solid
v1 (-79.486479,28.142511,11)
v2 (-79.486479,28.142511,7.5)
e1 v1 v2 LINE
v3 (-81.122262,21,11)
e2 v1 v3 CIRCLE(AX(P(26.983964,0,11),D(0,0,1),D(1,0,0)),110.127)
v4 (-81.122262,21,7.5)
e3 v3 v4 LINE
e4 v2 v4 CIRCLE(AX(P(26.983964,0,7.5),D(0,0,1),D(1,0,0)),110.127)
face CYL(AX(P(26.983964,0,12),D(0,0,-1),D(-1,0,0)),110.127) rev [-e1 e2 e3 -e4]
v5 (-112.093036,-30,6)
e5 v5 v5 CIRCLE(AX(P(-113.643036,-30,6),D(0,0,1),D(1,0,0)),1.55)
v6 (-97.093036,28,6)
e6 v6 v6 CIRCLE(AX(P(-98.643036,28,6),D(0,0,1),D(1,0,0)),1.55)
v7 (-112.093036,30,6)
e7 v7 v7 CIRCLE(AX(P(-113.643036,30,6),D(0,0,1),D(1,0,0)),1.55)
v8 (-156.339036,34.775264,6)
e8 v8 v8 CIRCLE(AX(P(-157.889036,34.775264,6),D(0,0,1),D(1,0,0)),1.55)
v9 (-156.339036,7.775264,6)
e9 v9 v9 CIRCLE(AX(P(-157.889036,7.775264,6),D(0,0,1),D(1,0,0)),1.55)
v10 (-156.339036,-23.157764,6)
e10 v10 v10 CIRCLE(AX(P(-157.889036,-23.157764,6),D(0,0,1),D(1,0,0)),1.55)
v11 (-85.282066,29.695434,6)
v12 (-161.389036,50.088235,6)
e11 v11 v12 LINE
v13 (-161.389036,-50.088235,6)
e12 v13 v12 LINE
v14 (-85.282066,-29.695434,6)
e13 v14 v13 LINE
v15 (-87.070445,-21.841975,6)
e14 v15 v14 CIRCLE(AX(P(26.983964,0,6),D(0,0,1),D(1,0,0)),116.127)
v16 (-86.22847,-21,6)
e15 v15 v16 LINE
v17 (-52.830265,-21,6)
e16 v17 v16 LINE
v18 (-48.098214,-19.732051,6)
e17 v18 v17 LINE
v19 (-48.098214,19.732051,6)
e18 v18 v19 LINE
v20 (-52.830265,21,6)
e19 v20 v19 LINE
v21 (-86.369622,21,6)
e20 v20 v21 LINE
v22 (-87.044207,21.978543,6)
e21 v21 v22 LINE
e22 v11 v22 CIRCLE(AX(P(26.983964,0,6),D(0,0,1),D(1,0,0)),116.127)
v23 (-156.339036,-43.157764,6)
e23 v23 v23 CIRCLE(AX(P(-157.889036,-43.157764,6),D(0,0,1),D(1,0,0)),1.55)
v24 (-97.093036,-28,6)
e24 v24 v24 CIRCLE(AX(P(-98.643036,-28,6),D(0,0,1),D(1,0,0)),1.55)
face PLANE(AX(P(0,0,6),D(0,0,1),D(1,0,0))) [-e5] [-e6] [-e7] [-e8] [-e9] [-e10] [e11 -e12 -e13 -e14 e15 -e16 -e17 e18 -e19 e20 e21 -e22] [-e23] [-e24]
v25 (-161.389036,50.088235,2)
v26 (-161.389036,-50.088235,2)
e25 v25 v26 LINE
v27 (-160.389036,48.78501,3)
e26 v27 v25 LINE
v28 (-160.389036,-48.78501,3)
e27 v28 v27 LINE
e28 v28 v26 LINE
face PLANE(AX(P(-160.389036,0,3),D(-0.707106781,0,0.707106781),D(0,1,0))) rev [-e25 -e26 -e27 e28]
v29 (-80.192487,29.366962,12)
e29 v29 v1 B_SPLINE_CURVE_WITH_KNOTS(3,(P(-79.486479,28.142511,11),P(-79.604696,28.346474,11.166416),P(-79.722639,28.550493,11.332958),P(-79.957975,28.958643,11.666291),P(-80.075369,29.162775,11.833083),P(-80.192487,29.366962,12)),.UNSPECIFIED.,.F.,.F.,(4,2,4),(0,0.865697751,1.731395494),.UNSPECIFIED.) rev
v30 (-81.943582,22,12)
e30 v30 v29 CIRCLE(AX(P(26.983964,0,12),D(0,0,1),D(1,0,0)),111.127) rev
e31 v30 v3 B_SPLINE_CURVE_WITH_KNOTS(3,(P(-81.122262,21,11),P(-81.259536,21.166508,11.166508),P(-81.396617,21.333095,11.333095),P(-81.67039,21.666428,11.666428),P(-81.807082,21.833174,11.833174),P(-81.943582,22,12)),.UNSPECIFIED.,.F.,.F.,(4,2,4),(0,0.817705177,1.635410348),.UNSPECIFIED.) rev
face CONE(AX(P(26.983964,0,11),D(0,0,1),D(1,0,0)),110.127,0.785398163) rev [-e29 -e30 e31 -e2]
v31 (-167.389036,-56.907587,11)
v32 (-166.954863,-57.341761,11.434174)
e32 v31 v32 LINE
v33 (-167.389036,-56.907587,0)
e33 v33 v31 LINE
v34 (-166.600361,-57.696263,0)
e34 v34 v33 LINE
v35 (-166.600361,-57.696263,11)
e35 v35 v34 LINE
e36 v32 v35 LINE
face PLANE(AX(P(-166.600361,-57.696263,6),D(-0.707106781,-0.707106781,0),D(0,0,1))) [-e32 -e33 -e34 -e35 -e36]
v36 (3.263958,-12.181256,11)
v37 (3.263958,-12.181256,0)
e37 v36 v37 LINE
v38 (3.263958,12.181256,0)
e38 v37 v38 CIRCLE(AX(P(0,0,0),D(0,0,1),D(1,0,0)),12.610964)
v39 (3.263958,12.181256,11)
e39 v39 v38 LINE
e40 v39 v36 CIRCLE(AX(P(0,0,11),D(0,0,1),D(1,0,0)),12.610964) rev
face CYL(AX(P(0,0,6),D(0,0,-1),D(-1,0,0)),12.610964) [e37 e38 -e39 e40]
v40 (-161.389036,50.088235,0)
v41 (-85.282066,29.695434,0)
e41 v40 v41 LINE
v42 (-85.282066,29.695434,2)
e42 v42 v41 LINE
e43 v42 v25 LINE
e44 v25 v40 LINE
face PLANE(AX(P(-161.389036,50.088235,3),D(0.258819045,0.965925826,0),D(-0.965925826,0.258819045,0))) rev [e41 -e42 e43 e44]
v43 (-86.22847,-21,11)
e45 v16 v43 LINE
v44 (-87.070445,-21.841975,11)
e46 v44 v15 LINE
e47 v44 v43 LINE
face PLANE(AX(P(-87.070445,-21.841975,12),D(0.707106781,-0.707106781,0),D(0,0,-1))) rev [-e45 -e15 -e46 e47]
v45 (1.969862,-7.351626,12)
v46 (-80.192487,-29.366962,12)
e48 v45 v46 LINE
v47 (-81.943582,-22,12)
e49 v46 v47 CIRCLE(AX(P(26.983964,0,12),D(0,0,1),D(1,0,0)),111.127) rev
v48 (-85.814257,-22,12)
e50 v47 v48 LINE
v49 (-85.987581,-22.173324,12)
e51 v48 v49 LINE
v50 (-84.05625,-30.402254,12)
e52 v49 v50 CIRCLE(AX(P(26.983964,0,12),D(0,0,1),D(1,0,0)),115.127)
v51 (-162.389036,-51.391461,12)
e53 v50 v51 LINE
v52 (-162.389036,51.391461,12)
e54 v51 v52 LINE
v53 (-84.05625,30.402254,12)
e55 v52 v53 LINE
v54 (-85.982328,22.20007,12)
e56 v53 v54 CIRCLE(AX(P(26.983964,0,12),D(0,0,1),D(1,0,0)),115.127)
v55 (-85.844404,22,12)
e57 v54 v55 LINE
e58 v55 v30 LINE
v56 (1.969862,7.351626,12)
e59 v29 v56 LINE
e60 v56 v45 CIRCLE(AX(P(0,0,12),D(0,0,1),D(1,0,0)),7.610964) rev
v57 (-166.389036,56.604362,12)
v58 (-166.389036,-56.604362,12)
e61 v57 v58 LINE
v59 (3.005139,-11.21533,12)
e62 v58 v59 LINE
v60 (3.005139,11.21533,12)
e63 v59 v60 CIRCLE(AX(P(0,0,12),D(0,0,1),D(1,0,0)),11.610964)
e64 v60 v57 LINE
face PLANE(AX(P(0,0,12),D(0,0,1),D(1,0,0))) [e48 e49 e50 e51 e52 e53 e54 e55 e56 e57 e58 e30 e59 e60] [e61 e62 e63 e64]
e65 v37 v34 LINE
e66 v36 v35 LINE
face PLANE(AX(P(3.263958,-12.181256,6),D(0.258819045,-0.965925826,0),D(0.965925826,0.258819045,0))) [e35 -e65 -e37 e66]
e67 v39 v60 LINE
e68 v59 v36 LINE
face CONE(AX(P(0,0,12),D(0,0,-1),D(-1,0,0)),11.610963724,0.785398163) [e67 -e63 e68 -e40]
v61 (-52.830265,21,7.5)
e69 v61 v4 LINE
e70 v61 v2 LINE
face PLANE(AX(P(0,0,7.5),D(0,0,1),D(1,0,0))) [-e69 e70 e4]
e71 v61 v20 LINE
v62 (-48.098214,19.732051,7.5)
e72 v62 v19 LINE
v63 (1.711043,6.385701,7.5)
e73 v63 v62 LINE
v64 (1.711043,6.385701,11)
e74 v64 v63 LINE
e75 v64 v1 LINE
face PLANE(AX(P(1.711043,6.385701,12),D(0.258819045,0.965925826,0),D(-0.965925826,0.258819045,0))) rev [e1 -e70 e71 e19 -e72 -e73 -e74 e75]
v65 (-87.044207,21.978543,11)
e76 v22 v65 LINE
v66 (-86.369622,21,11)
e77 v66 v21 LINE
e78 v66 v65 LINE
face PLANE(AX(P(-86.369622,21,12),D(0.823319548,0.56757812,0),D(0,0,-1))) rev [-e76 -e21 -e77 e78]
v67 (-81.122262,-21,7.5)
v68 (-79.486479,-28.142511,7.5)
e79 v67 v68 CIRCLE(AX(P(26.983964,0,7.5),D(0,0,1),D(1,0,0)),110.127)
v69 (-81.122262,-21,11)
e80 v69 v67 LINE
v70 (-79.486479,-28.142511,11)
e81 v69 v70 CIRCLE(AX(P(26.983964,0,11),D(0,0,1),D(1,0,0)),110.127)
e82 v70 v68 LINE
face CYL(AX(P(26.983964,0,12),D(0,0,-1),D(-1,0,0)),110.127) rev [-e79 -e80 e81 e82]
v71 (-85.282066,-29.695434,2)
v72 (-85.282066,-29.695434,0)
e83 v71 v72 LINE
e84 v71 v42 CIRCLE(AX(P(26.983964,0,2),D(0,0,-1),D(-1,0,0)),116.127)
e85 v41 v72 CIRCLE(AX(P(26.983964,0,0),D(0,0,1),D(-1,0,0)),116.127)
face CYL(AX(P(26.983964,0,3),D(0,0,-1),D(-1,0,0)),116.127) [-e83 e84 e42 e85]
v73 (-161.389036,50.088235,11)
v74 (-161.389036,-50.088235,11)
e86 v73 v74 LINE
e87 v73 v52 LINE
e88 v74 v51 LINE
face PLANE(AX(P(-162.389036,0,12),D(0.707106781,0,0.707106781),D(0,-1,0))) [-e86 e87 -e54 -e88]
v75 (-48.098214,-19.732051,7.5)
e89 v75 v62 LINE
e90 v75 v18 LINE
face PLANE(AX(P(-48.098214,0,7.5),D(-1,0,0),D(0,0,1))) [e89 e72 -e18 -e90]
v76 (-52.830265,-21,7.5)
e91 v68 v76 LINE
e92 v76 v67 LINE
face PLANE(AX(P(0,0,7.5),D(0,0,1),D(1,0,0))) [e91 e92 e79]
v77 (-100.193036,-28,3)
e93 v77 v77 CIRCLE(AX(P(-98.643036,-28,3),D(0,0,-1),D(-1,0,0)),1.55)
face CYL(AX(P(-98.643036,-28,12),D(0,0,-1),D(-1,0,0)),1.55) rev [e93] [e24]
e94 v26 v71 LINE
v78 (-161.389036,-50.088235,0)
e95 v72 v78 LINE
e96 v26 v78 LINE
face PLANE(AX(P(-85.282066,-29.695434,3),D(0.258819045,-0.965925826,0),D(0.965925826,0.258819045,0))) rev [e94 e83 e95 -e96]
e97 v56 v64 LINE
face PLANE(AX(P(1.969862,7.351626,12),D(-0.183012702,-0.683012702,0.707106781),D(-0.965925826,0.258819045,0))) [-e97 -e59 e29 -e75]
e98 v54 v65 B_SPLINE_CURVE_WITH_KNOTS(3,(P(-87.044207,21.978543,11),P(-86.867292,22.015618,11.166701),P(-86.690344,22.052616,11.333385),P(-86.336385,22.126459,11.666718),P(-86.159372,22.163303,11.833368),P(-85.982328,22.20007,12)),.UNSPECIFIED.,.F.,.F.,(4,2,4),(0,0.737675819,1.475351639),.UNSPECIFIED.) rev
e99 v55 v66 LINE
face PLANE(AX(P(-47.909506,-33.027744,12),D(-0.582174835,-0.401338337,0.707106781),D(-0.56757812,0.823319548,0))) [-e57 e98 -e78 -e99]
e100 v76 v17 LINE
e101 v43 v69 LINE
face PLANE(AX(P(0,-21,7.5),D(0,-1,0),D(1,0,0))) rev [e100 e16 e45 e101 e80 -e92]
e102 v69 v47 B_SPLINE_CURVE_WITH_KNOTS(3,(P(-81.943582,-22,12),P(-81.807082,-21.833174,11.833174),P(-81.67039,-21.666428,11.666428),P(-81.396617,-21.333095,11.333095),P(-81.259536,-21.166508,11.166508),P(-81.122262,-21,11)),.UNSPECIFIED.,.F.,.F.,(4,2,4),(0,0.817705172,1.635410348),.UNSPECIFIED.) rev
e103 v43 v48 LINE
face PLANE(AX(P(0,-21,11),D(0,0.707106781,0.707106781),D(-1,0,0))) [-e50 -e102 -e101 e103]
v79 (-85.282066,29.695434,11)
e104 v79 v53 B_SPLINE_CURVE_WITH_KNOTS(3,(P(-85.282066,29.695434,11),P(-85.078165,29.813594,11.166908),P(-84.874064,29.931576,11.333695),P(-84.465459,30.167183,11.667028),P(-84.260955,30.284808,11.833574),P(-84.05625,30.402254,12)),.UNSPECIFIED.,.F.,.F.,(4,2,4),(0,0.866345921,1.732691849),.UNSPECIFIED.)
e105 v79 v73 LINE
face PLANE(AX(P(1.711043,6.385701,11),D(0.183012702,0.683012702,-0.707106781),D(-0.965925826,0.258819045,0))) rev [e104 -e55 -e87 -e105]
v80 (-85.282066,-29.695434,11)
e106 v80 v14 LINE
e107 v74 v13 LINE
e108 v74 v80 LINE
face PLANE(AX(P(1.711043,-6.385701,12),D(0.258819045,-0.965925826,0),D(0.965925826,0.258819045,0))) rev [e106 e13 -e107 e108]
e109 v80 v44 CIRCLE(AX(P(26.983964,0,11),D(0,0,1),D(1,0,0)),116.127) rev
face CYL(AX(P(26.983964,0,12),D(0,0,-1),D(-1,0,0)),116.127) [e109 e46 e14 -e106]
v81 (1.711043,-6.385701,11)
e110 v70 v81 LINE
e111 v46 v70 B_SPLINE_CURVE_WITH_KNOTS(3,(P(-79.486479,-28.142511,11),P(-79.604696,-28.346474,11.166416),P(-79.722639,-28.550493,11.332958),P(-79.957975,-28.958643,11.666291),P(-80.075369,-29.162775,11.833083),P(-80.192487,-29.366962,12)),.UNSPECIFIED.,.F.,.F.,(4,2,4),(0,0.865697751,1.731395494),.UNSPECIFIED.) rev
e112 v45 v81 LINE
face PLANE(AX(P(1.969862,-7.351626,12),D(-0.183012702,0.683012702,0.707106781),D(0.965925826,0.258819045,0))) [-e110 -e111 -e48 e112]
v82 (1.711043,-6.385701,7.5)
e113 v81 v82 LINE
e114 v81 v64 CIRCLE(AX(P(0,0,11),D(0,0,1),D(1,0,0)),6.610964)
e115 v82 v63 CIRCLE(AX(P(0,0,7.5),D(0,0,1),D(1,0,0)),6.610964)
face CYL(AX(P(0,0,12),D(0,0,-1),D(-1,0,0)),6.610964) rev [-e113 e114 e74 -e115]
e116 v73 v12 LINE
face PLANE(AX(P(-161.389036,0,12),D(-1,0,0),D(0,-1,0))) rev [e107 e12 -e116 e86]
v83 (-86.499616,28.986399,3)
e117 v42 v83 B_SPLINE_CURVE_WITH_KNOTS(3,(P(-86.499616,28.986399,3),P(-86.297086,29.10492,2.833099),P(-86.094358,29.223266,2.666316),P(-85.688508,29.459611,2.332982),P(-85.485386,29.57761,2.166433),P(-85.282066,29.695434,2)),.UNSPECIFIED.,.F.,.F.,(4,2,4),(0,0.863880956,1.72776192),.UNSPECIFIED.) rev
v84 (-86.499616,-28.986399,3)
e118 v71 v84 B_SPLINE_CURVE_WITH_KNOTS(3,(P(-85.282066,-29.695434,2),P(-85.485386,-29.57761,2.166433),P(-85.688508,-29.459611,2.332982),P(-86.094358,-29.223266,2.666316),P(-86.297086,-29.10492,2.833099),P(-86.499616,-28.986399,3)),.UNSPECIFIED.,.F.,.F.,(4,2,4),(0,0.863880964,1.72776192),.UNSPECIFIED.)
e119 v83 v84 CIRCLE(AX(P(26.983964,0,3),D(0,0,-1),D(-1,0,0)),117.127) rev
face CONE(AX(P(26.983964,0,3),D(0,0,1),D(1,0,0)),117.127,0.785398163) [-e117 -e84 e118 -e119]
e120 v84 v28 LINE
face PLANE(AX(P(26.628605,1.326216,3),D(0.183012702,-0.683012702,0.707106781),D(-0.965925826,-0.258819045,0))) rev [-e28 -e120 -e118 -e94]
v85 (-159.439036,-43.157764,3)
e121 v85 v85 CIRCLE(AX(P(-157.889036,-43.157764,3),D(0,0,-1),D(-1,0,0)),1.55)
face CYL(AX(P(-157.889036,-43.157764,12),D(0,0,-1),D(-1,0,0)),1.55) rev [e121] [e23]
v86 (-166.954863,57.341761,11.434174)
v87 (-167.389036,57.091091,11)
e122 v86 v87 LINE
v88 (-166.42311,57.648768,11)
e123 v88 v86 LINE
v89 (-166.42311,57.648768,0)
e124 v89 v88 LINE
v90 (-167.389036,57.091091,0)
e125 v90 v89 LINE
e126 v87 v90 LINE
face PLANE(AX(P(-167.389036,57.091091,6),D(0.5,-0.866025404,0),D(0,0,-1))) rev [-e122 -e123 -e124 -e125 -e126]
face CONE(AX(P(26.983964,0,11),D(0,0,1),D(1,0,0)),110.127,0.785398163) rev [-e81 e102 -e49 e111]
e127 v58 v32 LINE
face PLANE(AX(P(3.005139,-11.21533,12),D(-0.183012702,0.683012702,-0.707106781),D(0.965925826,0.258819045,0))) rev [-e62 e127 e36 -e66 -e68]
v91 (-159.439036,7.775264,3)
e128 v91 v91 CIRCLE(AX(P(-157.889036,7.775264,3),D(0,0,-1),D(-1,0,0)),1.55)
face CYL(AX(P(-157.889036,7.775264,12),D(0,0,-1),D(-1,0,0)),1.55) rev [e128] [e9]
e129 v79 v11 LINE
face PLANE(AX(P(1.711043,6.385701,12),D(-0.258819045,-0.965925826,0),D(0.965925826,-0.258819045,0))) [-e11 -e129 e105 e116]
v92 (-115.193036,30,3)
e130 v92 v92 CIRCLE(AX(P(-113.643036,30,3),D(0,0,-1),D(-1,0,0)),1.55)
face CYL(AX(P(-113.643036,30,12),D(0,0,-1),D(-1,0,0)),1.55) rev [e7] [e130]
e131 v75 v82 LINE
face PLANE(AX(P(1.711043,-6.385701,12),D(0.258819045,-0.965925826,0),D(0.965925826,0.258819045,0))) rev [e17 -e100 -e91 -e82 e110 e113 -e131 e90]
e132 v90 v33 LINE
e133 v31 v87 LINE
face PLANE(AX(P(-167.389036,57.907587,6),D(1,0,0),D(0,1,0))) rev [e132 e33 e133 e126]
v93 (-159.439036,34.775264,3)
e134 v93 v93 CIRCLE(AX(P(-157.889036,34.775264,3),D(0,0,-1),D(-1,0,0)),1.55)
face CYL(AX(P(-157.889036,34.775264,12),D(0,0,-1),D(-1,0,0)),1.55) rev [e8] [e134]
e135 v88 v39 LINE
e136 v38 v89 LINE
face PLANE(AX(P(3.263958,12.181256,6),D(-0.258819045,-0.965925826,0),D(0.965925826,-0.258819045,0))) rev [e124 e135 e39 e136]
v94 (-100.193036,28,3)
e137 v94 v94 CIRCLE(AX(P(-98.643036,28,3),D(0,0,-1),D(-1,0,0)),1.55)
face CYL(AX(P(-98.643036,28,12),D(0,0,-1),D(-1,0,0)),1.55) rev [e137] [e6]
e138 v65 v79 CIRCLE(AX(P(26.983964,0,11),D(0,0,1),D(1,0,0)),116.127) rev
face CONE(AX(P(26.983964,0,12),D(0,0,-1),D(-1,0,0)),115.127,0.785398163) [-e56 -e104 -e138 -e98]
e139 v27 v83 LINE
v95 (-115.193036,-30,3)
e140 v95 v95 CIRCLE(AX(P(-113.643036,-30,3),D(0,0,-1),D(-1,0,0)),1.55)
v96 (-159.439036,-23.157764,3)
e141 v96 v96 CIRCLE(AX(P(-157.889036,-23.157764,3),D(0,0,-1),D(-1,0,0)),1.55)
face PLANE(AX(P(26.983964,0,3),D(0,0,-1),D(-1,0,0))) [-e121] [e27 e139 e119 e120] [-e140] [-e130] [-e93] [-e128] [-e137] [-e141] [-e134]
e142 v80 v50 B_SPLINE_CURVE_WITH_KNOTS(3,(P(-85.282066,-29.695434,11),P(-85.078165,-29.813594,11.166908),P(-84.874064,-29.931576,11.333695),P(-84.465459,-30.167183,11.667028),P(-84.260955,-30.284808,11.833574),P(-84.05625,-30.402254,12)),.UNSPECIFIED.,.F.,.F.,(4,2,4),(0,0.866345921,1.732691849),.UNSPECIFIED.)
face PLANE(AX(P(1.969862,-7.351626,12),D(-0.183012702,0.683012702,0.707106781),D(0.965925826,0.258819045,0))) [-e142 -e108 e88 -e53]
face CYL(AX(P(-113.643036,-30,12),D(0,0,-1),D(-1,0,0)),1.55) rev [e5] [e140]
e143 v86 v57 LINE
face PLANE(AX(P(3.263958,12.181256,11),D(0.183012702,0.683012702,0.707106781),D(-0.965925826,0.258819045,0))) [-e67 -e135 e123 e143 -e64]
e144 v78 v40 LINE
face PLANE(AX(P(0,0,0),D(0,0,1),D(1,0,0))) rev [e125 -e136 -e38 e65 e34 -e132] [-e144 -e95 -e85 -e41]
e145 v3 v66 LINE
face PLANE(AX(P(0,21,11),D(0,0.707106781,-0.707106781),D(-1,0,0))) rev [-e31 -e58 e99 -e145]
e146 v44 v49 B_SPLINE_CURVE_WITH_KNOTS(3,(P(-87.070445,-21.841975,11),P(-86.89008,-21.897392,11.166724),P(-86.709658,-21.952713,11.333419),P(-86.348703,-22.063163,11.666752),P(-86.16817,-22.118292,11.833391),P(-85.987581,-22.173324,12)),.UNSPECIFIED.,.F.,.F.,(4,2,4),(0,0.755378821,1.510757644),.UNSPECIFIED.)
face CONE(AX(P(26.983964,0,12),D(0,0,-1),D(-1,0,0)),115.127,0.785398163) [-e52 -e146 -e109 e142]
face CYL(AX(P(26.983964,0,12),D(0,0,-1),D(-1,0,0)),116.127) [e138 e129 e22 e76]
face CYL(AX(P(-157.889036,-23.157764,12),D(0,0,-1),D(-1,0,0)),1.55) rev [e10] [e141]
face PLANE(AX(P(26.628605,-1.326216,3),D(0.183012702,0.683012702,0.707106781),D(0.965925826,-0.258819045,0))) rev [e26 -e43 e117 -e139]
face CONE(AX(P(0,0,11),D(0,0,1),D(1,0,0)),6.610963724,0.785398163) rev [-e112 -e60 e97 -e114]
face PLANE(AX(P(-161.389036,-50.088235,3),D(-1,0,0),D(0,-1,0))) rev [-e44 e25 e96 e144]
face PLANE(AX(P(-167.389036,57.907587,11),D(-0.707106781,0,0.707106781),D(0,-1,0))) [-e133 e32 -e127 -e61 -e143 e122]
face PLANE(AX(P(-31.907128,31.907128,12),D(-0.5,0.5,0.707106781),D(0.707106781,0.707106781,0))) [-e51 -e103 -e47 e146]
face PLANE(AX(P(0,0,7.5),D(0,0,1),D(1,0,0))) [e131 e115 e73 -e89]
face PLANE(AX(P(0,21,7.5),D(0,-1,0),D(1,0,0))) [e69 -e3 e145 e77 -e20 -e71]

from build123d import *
from OCP.BRepFilletAPI import BRepFilletAPI_MakeChamfer

# Parameters (mm, degrees)
BOSS_EXTRUDE1_DEPTH     = 6
BOSS_EXTRUDE2_START     = 6
BOSS_EXTRUDE2_DEPTH     = 6
BOSS_EXTRUDE3_DEPTH     = 1.5
CUT_EXTRUDE3_DEPTH      = 6
CHAMFER1_SIZE           = 0.858848527
CHAMFER1_SIZE_2         = 1
CHAMFER2_SIZE           = 1
CHAMFER3_SIZE           = 1
CHAMFER3_SIZE2          = 0.816496581
CUT_EXTRUDE4_DEPTH      = 3
CHAMFER4_SIZE           = 1
CUT_EXTRUDE5_DEPTH      = 178.282114668
CUT_EXTRUDE5_DEPTH_BACK = 178.282114668
SKETCH8_R               = 1.55


with BuildPart() as part:
    # Sketch3 → Boss-Extrude1 (new body)
    with BuildSketch(Plane.XY):
        with BuildLine():
            Line((3.263957589, 12.181255556), (-167.389036276, 57.907587448))
            Line((-167.389036276, 57.907587448), (-167.389036276, -57.907587448))
            Line((-167.389036276, -57.907587448), (-83.597968128, -35.455838404))
            Line((-83.597968128, -35.455838404), (3.263957589, -12.181255556))
            ThreePointArc((3.263957589, -12.181255556), (12.610963724, 0), (3.263957589, 12.181255556))
        make_face()
    extrude(amount=BOSS_EXTRUDE1_DEPTH)

    # Sketch3<3> → Boss-Extrude2 (add)
    with BuildSketch(Plane.XY.offset(BOSS_EXTRUDE2_START)):
        with BuildLine():
            ThreePointArc((3.263957589, -12.181255556), (12.610963724, 0), (3.263957589, 12.181255556))
            Line((3.263957589, 12.181255556), (-167.389036276, 57.907587448))
            Line((-167.389036276, 57.907587448), (-167.389036276, -57.907587448))
            Line((-167.389036276, -57.907587448), (-83.597968128, -35.455838404))
            Line((-83.597968128, -35.455838404), (3.263957589, -12.181255556))
        make_face()
        with BuildLine():
            Line((1.711043318, -6.385700598), (-79.486479098, -28.142511157))
            ThreePointArc((-79.486479098, -28.142511157), (-83.143036276, 0), (-79.486479098, 28.142511157))
            Line((-79.486479098, 28.142511157), (1.711043318, 6.385700598))
            ThreePointArc((1.711043318, 6.385700598), (6.610963724, 0), (1.711043318, -6.385700598))
        make_face(mode=Mode.SUBTRACT)
        with BuildLine():
            Line((-85.282065581, -29.695433875), (-161.389036276, -50.088235211))
            Line((-161.389036276, -50.088235211), (-161.389036276, 50.088235211))
            Line((-161.389036276, 50.088235211), (-85.282065581, 29.695433875))
            ThreePointArc((-85.282065581, 29.695433875), (-89.143036276, 0), (-85.282065581, -29.695433875))
        make_face(mode=Mode.SUBTRACT)
    extrude(amount=BOSS_EXTRUDE2_DEPTH)

    # Sketch4 → Boss-Extrude3 (add)
    with BuildSketch(Plane.XY.offset(6)):
        with BuildLine():
            ThreePointArc((-79.486479098, 28.142511157), (-80.363791639, 24.584864194), (-81.12226241, 21))
            Line((-81.12226241, 21), (-52.830264568, 21))
            Line((-52.830264568, 21), (-79.486479098, 28.142511157))
        make_face()
        with BuildLine():
            Line((-79.486479098, -28.142511157), (-52.830264568, -21))
            Line((-52.830264568, -21), (-81.12226241, -21))
            ThreePointArc((-81.12226241, -21), (-80.363791639, -24.584864194), (-79.486479098, -28.142511157))
        make_face()
        with BuildLine():
            Line((-48.09821376, 19.732050808), (-48.09821376, -19.732050808))
            Line((-48.09821376, -19.732050808), (1.711043318, -6.385700598))
            ThreePointArc((1.711043318, -6.385700598), (6.610963724, 0), (1.711043318, 6.385700598))
            Line((1.711043318, 6.385700598), (-48.09821376, 19.732050808))
        make_face()
    extrude(amount=BOSS_EXTRUDE3_DEPTH)

    # Sketch5 → Cut-Extrude3 (cut)
    with BuildSketch(Plane.XY.offset(6)):
        with BuildLine():
            Line((-81.12226241, 21), (-87.228470489, 21))
            ThreePointArc((-87.228470489, 21), (-89.143036276, 0), (-87.228470489, -21))
            Line((-87.228470489, -21), (-81.12226241, -21))
            ThreePointArc((-81.12226241, -21), (-83.143036276, 0), (-81.12226241, 21))
        make_face()
    extrude(amount=CUT_EXTRUDE3_DEPTH, mode=Mode.SUBTRACT)

    # Chamfer1
    # the kernel refuses this chamfer: 1, 0.858848527 mm, written as the material it takes off along each edge
    with BuildSketch(Plane(origin=(-87.228470489, 21, 6), x_dir=(0.1850514416549976, 0.9827288354075131, 0), z_dir=(0, 0, 1))) as chamfer1_piece_1:
        with BuildLine():
            Line((0.995740125, 0), (CHAMFER1_SIZE * 0.185051441724, -CHAMFER1_SIZE * 0.982728835776))
            Line((CHAMFER1_SIZE * 0.185051441724, -CHAMFER1_SIZE * 0.982728835776), (0, 0))
            ThreePointArc((0, 0), (0.511949844, 0.001066408), (0.995740125, 0))
        make_face()
    extrude(amount=8.560742024, mode=Mode.SUBTRACT)
    with BuildSketch(Plane(origin=(-87.228470489, -21, 6), x_dir=(1, 0, 0), z_dir=(0, 0, 1))) as chamfer1_piece_2:
        with BuildLine():
            Line((CHAMFER1_SIZE_2, 0), (0.158025015, -0.841974985))
            ThreePointArc((0.158025015, -0.841974985), (0.080319075, -0.432228603), (0, 0))
            Line((0, 0), (CHAMFER1_SIZE_2, 0))
        make_face()
    extrude(amount=8.571682988, mode=Mode.SUBTRACT)

    # Chamfer2
    chamfer2_edges = [part.edges().sort_by_distance(p)[0] for p in [
        (-86.244364999, -25.784214234, 12),
        (-83.67536645, -21, 12),
        (-86.706914653, 21.489271267, 12),
        (-86.649457982, -21.420987493, 12),
        (-82.062539343, -35.044421502, 12),
        (12.610963724, 0, 12),
        (-161.389036276, 0, 12),
        (-86.228906055, 25.852006602, 12),
        (-123.335550929, -39.891834543, 12),
        (-38.88771789, 17.264105877, 12),
        (-38.88771789, -17.264105877, 12),
        (-82.062539343, 35.044421502, 12),
        (-167.389036276, 0, 12),
        (-123.335550929, 39.891834543, 12),
        (6.610963724, 0, 12),
        (-80.363791639, 24.584864194, 12),
        (-80.363791639, -24.584864194, 12),
        (-83.745942186, 21, 12),
    ]]
    chamfer(chamfer2_edges, length=CHAMFER2_SIZE)

    # Chamfer3: one chamfer whose edges measure the first distance from different faces: ONE call of the kernel's chamfer builder (chamfer() names one face for all edges)
    chamfer3_edges_1 = [part.edges().sort_by_distance(p)[0] for p in [
        (-167.389036276, -57.907587448, 5.5),
    ]]
    chamfer3_side_1 = [part.faces().sort_by_distance(p)[0] for p in [
        (-167.389036276, 0, 5.5),
    ]]
    chamfer3_edges_2 = [part.edges().sort_by_distance(p)[0] for p in [
        (-167.389036276, 57.907587448, 5.5),
    ]]
    chamfer3_side_2 = [part.faces().sort_by_distance(p)[0] for p in [
        (-82.062539343, 35.044421502, 5.5),
    ]]
    chamfer3 = BRepFilletAPI_MakeChamfer(part.part.solid().wrapped)
    for e in chamfer3_edges_1:
        chamfer3.Add(CHAMFER3_SIZE, CHAMFER3_SIZE2, e.wrapped, chamfer3_side_1[0].wrapped)  # the first distance lies on this face
    for e in chamfer3_edges_2:
        chamfer3.Add(CHAMFER3_SIZE, CHAMFER3_SIZE2, e.wrapped, chamfer3_side_2[0].wrapped)  # the first distance lies on this face
    add(Compound.cast(chamfer3.Shape()), mode=Mode.REPLACE)

    # Sketch7 → Cut-Extrude4 (cut)
    with BuildSketch(Plane(origin=(0, 0, 0), x_dir=(-1, 0, 0), z_dir=(0, 0, -1))):
        with BuildLine():
            Line((161.389036276, 50.088235211), (85.282065581, 29.695433875))
            ThreePointArc((85.282065581, 29.695433875), (89.143036276, 0), (85.282065581, -29.695433875))
            Line((85.282065581, -29.695433875), (161.389036276, -50.088235211))
            Line((161.389036276, -50.088235211), (161.389036276, 50.088235211))
        make_face()
    extrude(amount=-CUT_EXTRUDE4_DEPTH, mode=Mode.SUBTRACT)

    # Chamfer4
    chamfer4_edges = [part.edges().sort_by_distance(p)[0] for p in [
        (-89.143036276, 0, 3),
        (-123.335550929, 39.891834543, 3),
        (-161.389036276, 0, 3),
        (-123.335550929, -39.891834543, 3),
    ]]
    chamfer(chamfer4_edges, length=CHAMFER4_SIZE)

    # Sketch8 → Cut-Extrude5 (cut, two sides: drawn at the far end of the back side and taken through both)
    with BuildSketch(Plane(origin=(0, 0, 3), x_dir=(-1, 0, 0), z_dir=(0, 0, -1)).offset(-CUT_EXTRUDE5_DEPTH_BACK)):
        with Locations((157.889036276, 34.775263876)):
            Circle(SKETCH8_R)
        with Locations((157.889036276, 7.775263876)):
            Circle(SKETCH8_R)
        with Locations((157.889036276, -23.157763876)):
            Circle(SKETCH8_R)
        with Locations((157.889036276, -43.157763876)):
            Circle(SKETCH8_R)
        with Locations((98.643036276, 28)):
            Circle(SKETCH8_R)
        with Locations((113.643036276, 30)):
            Circle(SKETCH8_R)
        with Locations((98.643036276, -28)):
            Circle(SKETCH8_R)
        with Locations((113.643036276, -30)):
            Circle(SKETCH8_R)
    extrude(amount=CUT_EXTRUDE5_DEPTH + CUT_EXTRUDE5_DEPTH_BACK, mode=Mode.SUBTRACT)


solid = part.part
